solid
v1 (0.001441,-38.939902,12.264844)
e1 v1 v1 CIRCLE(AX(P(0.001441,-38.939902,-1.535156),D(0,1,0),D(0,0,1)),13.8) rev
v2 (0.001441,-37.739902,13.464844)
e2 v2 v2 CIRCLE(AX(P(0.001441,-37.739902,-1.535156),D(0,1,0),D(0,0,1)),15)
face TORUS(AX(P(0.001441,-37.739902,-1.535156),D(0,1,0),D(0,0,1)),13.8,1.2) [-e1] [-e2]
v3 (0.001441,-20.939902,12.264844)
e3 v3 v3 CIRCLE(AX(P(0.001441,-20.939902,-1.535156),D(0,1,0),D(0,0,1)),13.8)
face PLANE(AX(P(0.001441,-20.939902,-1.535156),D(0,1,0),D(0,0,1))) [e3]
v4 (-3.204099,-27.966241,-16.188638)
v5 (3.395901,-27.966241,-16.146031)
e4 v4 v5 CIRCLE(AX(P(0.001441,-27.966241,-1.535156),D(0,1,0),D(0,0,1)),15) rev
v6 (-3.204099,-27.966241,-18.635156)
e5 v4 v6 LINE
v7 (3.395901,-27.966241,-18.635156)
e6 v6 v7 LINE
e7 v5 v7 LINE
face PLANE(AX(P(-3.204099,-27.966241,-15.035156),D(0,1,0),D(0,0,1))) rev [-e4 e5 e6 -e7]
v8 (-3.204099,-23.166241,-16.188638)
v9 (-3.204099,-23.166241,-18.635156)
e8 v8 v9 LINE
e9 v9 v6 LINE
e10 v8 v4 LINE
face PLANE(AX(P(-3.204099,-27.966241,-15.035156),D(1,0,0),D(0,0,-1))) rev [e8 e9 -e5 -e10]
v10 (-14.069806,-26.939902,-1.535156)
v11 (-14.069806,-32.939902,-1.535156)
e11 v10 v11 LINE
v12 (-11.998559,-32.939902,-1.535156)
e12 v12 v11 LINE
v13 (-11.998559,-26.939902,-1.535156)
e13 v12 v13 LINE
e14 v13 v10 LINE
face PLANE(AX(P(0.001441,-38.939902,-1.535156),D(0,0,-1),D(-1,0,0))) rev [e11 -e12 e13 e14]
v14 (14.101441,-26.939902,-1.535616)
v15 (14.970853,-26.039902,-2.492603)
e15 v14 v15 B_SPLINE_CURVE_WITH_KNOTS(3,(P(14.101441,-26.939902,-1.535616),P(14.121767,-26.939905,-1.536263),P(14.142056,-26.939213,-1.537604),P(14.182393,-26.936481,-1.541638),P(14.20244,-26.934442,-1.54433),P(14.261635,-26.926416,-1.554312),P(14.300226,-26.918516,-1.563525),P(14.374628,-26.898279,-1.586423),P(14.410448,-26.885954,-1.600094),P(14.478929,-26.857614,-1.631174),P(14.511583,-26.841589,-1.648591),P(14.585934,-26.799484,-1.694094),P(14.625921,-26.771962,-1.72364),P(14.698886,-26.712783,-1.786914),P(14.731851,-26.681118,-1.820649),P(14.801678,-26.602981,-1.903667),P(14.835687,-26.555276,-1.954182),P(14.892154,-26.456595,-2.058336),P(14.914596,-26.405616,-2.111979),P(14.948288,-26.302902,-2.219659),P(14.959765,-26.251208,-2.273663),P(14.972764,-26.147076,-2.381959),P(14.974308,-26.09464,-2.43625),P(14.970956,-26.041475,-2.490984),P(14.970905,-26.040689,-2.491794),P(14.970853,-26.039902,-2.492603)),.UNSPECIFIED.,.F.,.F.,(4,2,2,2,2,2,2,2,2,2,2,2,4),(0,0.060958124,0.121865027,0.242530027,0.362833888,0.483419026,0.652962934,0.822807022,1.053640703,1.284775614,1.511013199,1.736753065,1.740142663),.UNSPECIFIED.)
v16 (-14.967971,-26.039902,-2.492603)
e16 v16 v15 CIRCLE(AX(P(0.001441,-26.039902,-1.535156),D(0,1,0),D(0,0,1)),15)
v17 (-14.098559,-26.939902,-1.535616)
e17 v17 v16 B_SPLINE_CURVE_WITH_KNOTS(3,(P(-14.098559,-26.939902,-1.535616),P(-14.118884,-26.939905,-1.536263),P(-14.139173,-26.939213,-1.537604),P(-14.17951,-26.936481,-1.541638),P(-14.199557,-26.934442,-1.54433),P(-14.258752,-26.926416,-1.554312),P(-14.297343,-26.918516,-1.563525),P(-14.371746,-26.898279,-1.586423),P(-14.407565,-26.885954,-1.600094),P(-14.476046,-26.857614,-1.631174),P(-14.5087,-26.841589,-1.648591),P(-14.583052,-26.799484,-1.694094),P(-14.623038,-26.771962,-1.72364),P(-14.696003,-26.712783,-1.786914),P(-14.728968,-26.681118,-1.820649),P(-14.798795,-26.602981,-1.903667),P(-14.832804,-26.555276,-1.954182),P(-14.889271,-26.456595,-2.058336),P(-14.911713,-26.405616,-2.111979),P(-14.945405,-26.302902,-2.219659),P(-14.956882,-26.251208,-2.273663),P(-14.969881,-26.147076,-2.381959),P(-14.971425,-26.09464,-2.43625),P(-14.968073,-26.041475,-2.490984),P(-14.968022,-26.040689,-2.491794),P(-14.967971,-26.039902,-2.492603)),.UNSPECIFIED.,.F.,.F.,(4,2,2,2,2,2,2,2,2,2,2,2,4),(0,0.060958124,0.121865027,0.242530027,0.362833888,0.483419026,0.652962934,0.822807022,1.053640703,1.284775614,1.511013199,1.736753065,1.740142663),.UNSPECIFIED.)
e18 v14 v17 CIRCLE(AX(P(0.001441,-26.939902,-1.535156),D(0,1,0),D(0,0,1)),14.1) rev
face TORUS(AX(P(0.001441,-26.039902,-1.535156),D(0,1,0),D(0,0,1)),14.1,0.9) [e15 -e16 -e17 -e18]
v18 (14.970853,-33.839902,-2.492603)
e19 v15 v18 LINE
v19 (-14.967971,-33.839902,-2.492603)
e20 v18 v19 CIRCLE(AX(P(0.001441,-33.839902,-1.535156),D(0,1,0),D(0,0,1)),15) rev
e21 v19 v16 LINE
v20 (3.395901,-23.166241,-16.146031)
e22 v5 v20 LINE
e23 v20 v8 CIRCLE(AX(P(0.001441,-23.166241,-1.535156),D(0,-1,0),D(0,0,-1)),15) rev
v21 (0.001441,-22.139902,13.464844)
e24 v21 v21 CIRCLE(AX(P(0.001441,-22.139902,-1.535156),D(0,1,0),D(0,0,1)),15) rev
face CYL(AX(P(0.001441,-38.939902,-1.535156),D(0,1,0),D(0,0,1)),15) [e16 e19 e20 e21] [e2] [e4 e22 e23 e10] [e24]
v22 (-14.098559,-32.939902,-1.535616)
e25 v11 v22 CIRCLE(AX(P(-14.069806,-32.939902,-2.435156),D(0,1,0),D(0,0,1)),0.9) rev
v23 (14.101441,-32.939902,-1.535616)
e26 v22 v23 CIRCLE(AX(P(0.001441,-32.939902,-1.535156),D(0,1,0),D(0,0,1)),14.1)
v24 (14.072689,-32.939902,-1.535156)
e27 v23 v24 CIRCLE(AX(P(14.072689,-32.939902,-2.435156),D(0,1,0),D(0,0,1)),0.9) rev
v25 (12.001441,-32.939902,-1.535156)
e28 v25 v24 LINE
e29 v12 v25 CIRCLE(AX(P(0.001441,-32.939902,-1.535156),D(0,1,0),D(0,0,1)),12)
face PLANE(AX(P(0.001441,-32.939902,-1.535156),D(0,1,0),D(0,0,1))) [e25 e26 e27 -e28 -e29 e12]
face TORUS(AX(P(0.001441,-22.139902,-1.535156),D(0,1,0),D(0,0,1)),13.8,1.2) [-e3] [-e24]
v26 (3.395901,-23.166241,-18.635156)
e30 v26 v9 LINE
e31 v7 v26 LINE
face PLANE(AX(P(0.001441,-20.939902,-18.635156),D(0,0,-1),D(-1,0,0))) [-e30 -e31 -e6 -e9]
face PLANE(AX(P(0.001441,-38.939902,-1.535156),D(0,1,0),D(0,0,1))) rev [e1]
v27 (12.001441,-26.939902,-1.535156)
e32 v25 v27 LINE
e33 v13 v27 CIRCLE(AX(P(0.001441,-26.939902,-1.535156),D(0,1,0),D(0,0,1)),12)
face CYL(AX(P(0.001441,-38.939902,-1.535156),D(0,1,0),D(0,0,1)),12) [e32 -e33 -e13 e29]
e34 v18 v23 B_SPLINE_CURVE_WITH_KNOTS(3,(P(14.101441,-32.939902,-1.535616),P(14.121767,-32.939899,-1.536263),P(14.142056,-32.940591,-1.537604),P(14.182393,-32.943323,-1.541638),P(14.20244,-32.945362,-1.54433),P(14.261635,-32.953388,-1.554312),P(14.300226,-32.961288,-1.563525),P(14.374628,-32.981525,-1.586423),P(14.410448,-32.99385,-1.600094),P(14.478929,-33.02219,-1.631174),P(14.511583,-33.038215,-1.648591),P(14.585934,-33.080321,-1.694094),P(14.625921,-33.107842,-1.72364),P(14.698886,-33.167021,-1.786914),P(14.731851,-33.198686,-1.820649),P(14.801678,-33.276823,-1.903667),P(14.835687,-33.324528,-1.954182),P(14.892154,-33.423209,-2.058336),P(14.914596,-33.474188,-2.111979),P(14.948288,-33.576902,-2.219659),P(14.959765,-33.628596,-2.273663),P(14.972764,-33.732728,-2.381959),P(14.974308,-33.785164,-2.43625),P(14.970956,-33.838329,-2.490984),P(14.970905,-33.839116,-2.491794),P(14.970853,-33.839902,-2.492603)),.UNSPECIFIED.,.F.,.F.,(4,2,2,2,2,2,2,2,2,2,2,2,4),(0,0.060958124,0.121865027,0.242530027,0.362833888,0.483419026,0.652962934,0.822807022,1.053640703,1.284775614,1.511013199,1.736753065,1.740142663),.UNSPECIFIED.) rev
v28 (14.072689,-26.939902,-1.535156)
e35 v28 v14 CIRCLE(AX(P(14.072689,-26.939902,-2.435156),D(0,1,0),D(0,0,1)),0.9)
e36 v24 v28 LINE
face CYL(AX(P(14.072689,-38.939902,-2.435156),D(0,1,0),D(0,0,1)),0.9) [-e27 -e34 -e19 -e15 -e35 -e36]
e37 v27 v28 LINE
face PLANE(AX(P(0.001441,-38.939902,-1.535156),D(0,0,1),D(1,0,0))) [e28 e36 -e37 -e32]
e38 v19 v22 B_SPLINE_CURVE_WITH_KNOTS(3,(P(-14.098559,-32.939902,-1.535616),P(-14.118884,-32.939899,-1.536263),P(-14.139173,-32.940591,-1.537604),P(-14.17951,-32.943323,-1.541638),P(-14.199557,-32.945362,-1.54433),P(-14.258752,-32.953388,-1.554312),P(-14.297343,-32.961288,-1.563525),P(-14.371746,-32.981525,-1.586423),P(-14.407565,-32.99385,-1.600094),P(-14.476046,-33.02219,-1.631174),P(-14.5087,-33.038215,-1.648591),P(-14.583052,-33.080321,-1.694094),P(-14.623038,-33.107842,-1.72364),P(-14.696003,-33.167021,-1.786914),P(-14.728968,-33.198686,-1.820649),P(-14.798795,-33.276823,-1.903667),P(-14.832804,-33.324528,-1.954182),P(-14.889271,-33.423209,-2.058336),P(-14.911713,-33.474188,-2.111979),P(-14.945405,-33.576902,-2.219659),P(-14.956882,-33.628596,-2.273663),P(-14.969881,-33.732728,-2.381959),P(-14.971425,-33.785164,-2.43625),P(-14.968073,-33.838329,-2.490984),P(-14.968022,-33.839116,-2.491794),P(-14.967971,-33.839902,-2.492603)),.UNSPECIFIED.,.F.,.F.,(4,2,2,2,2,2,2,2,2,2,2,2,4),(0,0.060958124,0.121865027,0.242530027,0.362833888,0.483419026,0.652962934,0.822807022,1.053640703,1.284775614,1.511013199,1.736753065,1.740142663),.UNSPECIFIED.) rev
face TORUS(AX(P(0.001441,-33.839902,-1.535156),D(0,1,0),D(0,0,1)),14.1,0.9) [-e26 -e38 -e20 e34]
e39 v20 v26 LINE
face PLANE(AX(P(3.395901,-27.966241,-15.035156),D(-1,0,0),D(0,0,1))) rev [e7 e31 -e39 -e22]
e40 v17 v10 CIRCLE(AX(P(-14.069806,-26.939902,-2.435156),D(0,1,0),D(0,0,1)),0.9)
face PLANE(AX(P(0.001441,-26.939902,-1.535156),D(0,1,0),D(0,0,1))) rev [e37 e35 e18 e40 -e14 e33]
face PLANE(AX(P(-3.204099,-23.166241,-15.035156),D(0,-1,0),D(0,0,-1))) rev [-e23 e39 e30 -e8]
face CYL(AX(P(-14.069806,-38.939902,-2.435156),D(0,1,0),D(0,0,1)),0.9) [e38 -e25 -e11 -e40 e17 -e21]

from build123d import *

# Parameters (mm, degrees)
BOSS_EXTRUDE2_DEPTH = 60
BOSS_EXTRUDE3_DEPTH = 20
BOSS_EXTRUDE5_START = -40
BOSS_EXTRUDE5_DEPTH = 20
FILLET2_START       = -43.0000001
FILLET2_OUTLINE_R   = 50
FILLET2_DEPTH       = 3.0000001
FILLET2_START_2     = -20
FILLET2_2_OUTLINE_R = 50
FILLET2_2_DEPTH     = 3.0000001
FILLET2_START_3     = -40
FILLET2_3_DEPTH     = 20
FILLET2_START_4     = -56.0000001
FILLET2_5_DEPTH     = 42.000000197
SKETCH2_W           = 22
SKETCH2_H           = 16
BOSS_EXTRUDE6_DEPTH = 5
SKETCH2_2_W         = 22
SKETCH2_2_H         = 16
BOSS_EXTRUDE7_DEPTH = 7
SCALE6_SCALE        = 0.3


with BuildPart() as part:
    # Sketch1 → Boss-Extrude2 (new body)
    with BuildSketch(Plane(origin=(0, 0, 0), x_dir=(1, 0, 0), z_dir=(0, 1, 0))):
        with BuildLine():
            ThreePointArc((-40, 0), (0, -40), (40, 0))
            Line((40, 0), (50, 0))
            ThreePointArc((50, 0), (0, 50), (-50, 0))
            Line((-50, 0), (-40, 0))
        make_face()
    extrude(amount=-BOSS_EXTRUDE2_DEPTH)

    # Sketch1<4> → Boss-Extrude3 (add)
    with BuildSketch(Plane(origin=(0, 0, 0), x_dir=(1, 0, 0), z_dir=(0, 1, 0))):
        with BuildLine():
            ThreePointArc((-40, 0), (0, -40), (40, 0))
            Line((40, 0), (50, 0))
            ThreePointArc((50, 0), (0, 50), (-50, 0))
            Line((-50, 0), (-40, 0))
        make_face()
        with BuildLine():
            Line((50, 0), (40, 0))
            ThreePointArc((40, 0), (0, -40), (-40, 0))
            Line((-40, 0), (-50, 0))
            ThreePointArc((-50, 0), (0, -50), (50, 0))
        make_face()
    extrude(amount=-BOSS_EXTRUDE3_DEPTH)

    # Sketch1<6> → Boss-Extrude5 (add)
    with BuildSketch(Plane(origin=(0, 0, 0), x_dir=(1, 0, 0), z_dir=(0, 1, 0)).offset(BOSS_EXTRUDE5_START)):
        with BuildLine():
            ThreePointArc((-40, 0), (0, -40), (40, 0))
            Line((40, 0), (50, 0))
            ThreePointArc((50, 0), (0, 50), (-50, 0))
            Line((-50, 0), (-40, 0))
        make_face()
        with BuildLine():
            Line((50, 0), (40, 0))
            ThreePointArc((40, 0), (0, -40), (-40, 0))
            Line((-40, 0), (-50, 0))
            ThreePointArc((-50, 0), (0, -50), (50, 0))
        make_face()
    extrude(amount=-BOSS_EXTRUDE5_DEPTH)

    # Fillet1: read off the stored shape, not the designer's step
    # Fillet1 outline → Fillet1 (revolve, cut)
    with BuildSketch(Plane.XY):
        with BuildLine():
            ThreePointArc((46, 0), (48.828427125, -1.171572875), (50, -4))
            Line((50, -4), (50, 0))
            Line((50, 0), (46, 0))
        make_face()
        with BuildLine():
            Line((50, -60), (50, -56))
            ThreePointArc((50, -56), (48.828427125, -58.828427125), (46, -60))
            Line((46, -60), (50, -60))
        make_face()
    revolve(axis=Axis((0, 0, 0), (0, 1, 0)), mode=Mode.SUBTRACT)

    # Fillet2: read off the stored shape, not the designer's step
    # Fillet2 outline → Fillet2 (cut)
    with BuildSketch(Plane(origin=(0, 0, 0), x_dir=(1, 0, 0), z_dir=(0, 1, 0)).offset(FILLET2_START)):
        Circle(FILLET2_OUTLINE_R)
    extrude(amount=FILLET2_DEPTH, mode=Mode.SUBTRACT)

    # Fillet2 2 outline → Fillet2 2 (cut)
    with BuildSketch(Plane(origin=(0, 0, 0), x_dir=(1, 0, 0), z_dir=(0, 1, 0)).offset(FILLET2_START_2)):
        Circle(FILLET2_2_OUTLINE_R)
    extrude(amount=FILLET2_2_DEPTH, mode=Mode.SUBTRACT)

    # Fillet2 3 outline → Fillet2 3 (cut)
    with BuildSketch(Plane(origin=(0, 0, 0), x_dir=(1, 0, 0), z_dir=(0, 1, 0)).offset(FILLET2_START_3)):
        with BuildLine():
            ThreePointArc((49.898039998, 3.191489362), (49.092132471, 0.947497635), (46.904157598, 0))
            Line((46.904157598, 0), (50, 0))
            ThreePointArc((50, 0), (49.974503499, 1.596558814), (49.898039998, 3.191489362))
        make_face()
        with BuildLine():
            ThreePointArc((-46.904157598, 0), (-49.092132471, 0.947497635), (-49.898039998, 3.191489362))
            ThreePointArc((-49.898039998, 3.191489362), (-49.974503499, 1.596558814), (-50, 0))
            Line((-50, 0), (-46.904157598, 0))
        make_face()
    extrude(amount=FILLET2_3_DEPTH, mode=Mode.SUBTRACT)

    # Fillet2 4 outline → Fillet2 4 (revolve)
    with BuildSketch(Plane.XY):
        with BuildLine():
            Line((0, -17), (0, -20))
            Line((0, -20), (47, -20))
            ThreePointArc((47, -20), (49.121320344, -19.121320344), (50, -17))
            Line((50, -17), (0, -17))
        make_face()
        with BuildLine():
            Line((47, -40), (0, -40))
            Line((0, -40), (0, -43))
            Line((0, -43), (50, -43))
            ThreePointArc((50, -43), (49.121320344, -40.878679656), (47, -40))
        make_face()
    revolve(axis=Axis((0, 0, 0), (0, 1, 0)))

    # Fillet2 5 outline → Fillet2 5 (add)
    with BuildSketch(Plane(origin=(0, 0, 0), x_dir=(1, 0, 0), z_dir=(0, 1, 0)).offset(FILLET2_START_4)):
        with BuildLine():
            ThreePointArc((46.904157598, 0), (49.092132471, 0.947497635), (49.898039998, 3.191489362))
            ThreePointArc((49.898039998, 3.191489362), (0, 50), (-49.898039998, 3.191489362))
            ThreePointArc((-49.898039998, 3.191489362), (-49.092132471, 0.947497635), (-46.904157598, 0))
            Line((-46.904157598, 0), (46.904157598, 0))
        make_face()
    extrude(amount=FILLET2_5_DEPTH)

    # Sketch2 → Boss-Extrude6 (add)
    with BuildSketch(Plane.XY.offset(-50)):
        with Locations((0.314864649, -15.421130919)):
            Rectangle(SKETCH2_W, SKETCH2_H)
    extrude(amount=BOSS_EXTRUDE6_DEPTH)

    # Sketch2<2> → Boss-Extrude7 (add)
    with BuildSketch(Plane.XY.offset(-50)):
        with Locations((0.314864649, -15.421130919)):
            Rectangle(SKETCH2_2_W, SKETCH2_2_H)
    extrude(amount=-BOSS_EXTRUDE7_DEPTH)


with BuildPart() as part_1:
    # Scale6: scaled about (0.002059133, -29.914145752, -2.193081509)
    add(part.part.scale(SCALE6_SCALE).moved(Location((0.001441393, -20.939902026, -1.535157056))))


solid = part_1.part
